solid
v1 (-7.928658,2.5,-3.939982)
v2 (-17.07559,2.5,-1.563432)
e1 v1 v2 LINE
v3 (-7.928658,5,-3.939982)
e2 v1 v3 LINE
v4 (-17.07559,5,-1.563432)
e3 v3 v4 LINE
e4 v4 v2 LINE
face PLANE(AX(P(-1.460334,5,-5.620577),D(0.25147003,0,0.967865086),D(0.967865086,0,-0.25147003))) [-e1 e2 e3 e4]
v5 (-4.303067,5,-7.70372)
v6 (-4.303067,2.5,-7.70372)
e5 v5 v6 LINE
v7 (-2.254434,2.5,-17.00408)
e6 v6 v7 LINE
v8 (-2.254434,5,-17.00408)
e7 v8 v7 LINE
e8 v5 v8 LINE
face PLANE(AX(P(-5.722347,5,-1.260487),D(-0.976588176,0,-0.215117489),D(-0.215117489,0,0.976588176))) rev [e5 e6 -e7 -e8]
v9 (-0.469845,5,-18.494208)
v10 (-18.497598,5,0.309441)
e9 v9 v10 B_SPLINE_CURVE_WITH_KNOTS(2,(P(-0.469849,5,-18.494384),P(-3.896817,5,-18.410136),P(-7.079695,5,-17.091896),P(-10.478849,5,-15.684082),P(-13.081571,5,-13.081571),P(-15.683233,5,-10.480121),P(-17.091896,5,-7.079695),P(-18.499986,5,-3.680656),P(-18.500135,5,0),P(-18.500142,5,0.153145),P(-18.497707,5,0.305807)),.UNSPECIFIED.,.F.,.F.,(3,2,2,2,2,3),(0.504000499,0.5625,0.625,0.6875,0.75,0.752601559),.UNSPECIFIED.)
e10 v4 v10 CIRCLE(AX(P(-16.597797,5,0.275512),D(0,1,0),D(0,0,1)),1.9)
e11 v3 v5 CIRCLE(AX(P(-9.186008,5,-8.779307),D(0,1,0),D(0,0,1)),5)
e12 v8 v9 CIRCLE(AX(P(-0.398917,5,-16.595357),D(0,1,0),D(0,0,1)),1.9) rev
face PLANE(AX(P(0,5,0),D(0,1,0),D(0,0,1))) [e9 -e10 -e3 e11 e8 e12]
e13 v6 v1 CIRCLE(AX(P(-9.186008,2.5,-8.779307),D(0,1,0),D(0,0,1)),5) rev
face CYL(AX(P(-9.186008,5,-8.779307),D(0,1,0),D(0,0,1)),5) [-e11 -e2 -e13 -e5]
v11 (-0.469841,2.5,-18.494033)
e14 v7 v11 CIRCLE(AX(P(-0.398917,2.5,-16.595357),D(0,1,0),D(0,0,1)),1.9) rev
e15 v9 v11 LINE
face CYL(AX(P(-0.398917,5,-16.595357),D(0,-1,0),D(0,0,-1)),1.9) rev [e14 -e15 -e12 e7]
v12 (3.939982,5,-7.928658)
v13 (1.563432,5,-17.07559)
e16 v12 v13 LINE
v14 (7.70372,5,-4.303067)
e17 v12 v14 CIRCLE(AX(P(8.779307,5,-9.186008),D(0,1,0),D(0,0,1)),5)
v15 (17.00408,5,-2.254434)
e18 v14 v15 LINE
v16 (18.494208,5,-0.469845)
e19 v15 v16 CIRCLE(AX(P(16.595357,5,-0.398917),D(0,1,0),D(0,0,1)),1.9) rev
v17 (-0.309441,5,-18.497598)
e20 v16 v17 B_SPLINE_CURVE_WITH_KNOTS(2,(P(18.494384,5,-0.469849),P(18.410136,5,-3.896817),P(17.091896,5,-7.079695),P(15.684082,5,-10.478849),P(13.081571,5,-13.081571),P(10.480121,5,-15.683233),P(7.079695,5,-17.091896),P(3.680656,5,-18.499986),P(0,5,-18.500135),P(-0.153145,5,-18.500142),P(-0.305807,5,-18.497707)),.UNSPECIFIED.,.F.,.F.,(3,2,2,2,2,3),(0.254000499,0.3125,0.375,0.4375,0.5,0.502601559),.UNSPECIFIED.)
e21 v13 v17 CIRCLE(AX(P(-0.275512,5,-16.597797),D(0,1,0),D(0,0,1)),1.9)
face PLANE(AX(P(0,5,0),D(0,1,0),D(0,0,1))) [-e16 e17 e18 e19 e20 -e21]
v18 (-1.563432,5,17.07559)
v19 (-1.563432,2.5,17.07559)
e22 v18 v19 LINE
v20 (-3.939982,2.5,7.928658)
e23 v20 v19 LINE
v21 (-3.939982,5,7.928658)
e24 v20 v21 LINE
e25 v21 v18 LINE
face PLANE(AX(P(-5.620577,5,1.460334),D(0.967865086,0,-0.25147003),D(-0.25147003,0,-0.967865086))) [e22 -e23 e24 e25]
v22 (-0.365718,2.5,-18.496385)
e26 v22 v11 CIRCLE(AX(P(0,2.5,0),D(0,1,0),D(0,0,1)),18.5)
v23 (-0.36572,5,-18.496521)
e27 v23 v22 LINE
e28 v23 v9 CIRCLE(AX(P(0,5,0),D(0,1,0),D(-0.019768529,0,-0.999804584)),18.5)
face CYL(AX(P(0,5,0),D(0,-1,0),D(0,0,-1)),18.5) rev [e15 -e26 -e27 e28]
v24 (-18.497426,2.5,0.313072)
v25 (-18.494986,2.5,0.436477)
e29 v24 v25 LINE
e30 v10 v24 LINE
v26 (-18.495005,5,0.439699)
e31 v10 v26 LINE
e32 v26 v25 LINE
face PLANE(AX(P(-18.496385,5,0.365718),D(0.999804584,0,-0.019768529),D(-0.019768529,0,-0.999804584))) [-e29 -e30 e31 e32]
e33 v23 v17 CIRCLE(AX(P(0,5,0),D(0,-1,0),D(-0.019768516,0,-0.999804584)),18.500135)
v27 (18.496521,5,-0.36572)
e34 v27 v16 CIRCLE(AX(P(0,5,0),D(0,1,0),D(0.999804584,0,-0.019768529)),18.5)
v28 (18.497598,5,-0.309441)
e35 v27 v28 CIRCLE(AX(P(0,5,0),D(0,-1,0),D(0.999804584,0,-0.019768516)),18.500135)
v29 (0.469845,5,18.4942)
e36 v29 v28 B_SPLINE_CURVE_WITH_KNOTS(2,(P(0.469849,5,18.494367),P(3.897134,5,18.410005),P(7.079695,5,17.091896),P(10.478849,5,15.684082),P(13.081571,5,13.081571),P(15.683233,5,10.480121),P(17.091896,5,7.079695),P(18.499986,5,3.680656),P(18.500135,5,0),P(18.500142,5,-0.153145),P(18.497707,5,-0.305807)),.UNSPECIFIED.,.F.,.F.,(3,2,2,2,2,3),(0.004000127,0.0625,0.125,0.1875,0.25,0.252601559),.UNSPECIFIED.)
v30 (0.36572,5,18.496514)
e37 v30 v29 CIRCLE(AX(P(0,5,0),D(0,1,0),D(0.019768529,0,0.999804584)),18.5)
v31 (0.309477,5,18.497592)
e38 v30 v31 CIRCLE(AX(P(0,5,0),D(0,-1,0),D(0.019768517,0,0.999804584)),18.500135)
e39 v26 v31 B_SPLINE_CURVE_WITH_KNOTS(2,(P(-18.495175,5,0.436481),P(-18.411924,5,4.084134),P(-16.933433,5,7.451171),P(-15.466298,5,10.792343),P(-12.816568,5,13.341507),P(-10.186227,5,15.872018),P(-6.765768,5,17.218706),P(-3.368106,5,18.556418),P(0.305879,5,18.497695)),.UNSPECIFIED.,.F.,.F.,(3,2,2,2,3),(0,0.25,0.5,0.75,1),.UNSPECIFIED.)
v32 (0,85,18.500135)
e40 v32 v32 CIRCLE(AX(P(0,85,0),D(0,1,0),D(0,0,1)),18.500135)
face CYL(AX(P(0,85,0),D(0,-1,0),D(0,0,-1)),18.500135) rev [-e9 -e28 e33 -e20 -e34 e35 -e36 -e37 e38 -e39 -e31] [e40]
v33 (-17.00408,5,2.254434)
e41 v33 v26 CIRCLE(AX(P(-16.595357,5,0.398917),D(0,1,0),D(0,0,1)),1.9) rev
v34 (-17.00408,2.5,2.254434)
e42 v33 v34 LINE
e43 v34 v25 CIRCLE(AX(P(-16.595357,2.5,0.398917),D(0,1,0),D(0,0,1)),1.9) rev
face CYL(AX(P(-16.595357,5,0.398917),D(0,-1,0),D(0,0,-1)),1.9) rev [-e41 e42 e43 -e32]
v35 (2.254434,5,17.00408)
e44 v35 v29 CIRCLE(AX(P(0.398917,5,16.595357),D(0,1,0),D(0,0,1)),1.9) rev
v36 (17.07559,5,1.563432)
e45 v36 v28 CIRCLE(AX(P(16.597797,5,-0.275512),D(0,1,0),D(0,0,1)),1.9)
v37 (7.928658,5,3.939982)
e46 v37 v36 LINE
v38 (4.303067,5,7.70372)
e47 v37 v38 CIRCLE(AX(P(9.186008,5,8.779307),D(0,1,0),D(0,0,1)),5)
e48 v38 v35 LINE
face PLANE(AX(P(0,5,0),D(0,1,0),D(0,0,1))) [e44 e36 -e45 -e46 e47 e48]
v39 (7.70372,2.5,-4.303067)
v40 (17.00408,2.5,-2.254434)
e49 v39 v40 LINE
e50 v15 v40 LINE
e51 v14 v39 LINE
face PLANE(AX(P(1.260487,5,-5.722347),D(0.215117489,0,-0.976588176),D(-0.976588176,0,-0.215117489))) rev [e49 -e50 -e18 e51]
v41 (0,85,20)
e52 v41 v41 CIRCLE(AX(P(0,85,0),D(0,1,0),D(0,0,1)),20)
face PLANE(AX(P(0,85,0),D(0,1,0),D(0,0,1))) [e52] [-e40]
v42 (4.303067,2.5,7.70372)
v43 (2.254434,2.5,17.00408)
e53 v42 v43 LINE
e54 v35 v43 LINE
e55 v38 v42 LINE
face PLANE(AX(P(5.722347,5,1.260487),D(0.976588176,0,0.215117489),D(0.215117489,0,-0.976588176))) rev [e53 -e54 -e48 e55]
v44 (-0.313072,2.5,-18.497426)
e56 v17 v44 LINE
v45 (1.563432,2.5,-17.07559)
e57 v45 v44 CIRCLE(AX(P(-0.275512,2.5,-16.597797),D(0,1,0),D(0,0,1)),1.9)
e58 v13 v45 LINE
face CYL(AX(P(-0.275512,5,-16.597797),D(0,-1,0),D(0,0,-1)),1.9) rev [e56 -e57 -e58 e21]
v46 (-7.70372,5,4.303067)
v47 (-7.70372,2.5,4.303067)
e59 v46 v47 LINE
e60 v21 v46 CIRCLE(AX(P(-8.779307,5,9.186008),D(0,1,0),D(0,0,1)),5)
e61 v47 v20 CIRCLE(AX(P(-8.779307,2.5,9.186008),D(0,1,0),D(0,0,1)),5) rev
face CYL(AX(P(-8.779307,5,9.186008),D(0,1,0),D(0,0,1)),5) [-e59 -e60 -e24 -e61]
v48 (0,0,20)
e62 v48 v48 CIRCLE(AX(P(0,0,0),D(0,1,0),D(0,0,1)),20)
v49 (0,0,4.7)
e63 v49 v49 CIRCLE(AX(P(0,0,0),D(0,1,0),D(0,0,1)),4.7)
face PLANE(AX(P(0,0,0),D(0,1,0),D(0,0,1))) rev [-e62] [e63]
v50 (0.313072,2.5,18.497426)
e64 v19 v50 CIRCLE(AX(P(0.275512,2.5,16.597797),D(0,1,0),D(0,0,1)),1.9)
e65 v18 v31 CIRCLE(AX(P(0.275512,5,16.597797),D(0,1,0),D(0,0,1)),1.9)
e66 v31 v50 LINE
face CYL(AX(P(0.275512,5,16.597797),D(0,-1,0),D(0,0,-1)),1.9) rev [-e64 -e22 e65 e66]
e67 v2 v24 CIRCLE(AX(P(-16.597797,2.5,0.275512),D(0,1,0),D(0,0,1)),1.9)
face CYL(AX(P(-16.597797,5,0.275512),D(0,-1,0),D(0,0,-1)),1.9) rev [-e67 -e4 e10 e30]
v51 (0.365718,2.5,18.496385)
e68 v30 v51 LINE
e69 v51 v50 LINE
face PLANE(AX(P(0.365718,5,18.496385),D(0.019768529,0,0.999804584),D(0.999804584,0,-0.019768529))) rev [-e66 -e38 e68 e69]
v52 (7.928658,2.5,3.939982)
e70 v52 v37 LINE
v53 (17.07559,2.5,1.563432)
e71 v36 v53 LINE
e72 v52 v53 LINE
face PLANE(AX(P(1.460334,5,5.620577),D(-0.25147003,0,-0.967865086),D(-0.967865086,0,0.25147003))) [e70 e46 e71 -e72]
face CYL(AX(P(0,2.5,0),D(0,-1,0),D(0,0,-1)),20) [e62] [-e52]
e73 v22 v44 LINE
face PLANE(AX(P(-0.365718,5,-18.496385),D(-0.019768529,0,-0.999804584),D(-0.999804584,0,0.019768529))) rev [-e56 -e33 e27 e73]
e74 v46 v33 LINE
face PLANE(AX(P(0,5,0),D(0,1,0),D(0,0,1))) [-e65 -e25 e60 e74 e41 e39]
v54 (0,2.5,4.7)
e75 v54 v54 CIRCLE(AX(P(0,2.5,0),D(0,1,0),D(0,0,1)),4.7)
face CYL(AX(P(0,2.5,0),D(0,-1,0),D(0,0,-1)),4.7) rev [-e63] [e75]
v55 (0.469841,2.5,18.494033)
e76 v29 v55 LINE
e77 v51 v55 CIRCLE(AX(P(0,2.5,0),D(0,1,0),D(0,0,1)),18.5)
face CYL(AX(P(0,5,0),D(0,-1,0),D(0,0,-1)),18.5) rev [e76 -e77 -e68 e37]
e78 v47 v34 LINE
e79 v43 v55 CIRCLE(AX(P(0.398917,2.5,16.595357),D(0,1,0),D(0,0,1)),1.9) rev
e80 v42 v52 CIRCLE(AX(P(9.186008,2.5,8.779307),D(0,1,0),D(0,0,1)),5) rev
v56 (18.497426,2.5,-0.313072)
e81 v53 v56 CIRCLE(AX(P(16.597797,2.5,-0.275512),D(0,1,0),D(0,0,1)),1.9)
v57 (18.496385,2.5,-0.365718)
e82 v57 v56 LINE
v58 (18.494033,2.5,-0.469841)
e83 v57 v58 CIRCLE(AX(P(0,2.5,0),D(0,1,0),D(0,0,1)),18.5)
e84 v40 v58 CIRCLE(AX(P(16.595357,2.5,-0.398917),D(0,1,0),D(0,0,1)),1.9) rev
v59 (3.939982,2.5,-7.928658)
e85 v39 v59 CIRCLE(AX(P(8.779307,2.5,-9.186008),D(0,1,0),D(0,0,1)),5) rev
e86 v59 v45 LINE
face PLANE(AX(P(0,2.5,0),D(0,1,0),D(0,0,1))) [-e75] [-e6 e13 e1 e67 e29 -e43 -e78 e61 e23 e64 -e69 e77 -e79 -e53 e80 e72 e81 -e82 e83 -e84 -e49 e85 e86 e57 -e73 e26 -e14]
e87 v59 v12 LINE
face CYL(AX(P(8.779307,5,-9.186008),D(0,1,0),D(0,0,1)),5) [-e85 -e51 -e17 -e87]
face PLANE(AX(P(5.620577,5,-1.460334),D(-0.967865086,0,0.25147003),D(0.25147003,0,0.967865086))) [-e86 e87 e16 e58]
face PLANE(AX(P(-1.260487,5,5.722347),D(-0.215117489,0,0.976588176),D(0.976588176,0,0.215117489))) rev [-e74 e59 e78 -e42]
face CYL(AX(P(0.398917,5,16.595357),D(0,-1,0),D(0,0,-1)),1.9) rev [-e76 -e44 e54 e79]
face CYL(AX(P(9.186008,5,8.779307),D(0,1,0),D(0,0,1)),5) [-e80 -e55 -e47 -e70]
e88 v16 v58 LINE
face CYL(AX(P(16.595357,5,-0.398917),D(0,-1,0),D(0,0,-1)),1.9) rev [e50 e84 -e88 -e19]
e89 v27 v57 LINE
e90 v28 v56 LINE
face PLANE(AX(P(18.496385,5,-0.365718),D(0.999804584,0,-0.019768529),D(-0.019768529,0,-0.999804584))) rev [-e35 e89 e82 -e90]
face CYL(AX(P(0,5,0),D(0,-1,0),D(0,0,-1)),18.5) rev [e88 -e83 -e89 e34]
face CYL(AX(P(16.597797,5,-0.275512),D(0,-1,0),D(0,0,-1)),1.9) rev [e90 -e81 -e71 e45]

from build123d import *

# Parameters (mm, degrees)
SKETCH_1_R      = 20
SKETCH_1_R_2    = 4.7
EXTRUDE_1_DEPTH = 2.5
SKETCH_2_R      = 20
EXTRUDE_2_DEPTH = 2.5
FILLET_1_R      = 5
SKETCH_3_R      = 20
SKETCH_3_R_2    = 18.500135374
EXTRUDE_3_DEPTH = 80


with BuildPart() as part:
    # 草图1 → 凸台-拉伸1 (new body)
    with BuildSketch(Plane(origin=(0, 0, 0), x_dir=(1, 0, 0), z_dir=(0, 1, 0))):
        Circle(SKETCH_1_R)
        Circle(SKETCH_1_R_2, mode=Mode.SUBTRACT)
    extrude(amount=EXTRUDE_1_DEPTH)

    # 草图2 → 凸台-拉伸2 (add)
    with BuildSketch(Plane(origin=(0, 2.5, 0), x_dir=(1, 0, 0), z_dir=(0, 1, 0))):
        Circle(SKETCH_2_R)
        with BuildLine():
            Line((-1.563432113, -17.075590083), (-4.71068404, -4.96235635))
            Line((-4.71068404, -4.96235635), (-17.004080234, -2.254434443))
            ThreePointArc((-17.004080234, -2.254434443), (-18.064494297, -1.603755329), (-18.494985714, -0.436477113))
            Line((-18.494985714, -0.436477113), (-18.496384796, -0.365717778))
            Line((-18.496384796, -0.365717778), (-18.497425733, -0.313071754))
            ThreePointArc((-18.497425733, -0.313071754), (-18.11217817, 0.871942042), (-17.075590083, 1.563432113))
            Line((-17.075590083, 1.563432113), (-4.96235635, 4.71068404))
            Line((-4.96235635, 4.71068404), (-2.254434443, 17.004080234))
            ThreePointArc((-2.254434443, 17.004080234), (-1.616612902, 18.053855023), (-0.469840502, 18.494032819))
            ThreePointArc((-0.469840502, 18.494032819), (-0.417780795, 18.49528208), (-0.365717778, 18.496384796))
            Line((-0.365717778, 18.496384796), (-0.313071754, 18.497425733))
            ThreePointArc((-0.313071754, 18.497425733), (0.871942042, 18.11217817), (1.563432113, 17.075590083))
            Line((1.563432113, 17.075590083), (4.71068404, 4.96235635))
            Line((4.71068404, 4.96235635), (17.004080234, 2.254434443))
            ThreePointArc((17.004080234, 2.254434443), (18.053855023, 1.616612902), (18.494032819, 0.469840502))
            ThreePointArc((18.494032819, 0.469840502), (18.49528208, 0.417780795), (18.496384796, 0.365717778))
            Line((18.496384796, 0.365717778), (18.497425733, 0.313071754))
            ThreePointArc((18.497425733, 0.313071754), (18.11217817, -0.871942042), (17.075590083, -1.563432113))
            Line((17.075590083, -1.563432113), (4.96235635, -4.71068404))
            Line((4.96235635, -4.71068404), (2.254434443, -17.004080234))
            ThreePointArc((2.254434443, -17.004080234), (1.616612902, -18.053855023), (0.469840502, -18.494032819))
            ThreePointArc((0.469840502, -18.494032819), (0.417780795, -18.49528208), (0.365717778, -18.496384796))
            Line((0.365717778, -18.496384796), (0.313071754, -18.497425733))
            ThreePointArc((0.313071754, -18.497425733), (-0.871942042, -18.11217817), (-1.563432113, -17.075590083))
        make_face(mode=Mode.SUBTRACT)
    extrude(amount=EXTRUDE_2_DEPTH)

    # 圆角1
    fillet_1_edges = [part.edges().sort_by_distance(p)[0] for p in [
        (-4.71068404, 3.75, 4.96235635),
        (-4.96235635, 3.75, -4.71068404),
        (4.96235635, 3.75, 4.71068404),
        (4.71068404, 3.75, -4.96235635),
    ]]
    fillet(fillet_1_edges, radius=FILLET_1_R)

    # 草图3 → 凸台-拉伸3 (add)
    with BuildSketch(Plane(origin=(0, 5, 0), x_dir=(1, 0, 0), z_dir=(0, 1, 0))):
        Circle(SKETCH_3_R)
        Circle(SKETCH_3_R_2, mode=Mode.SUBTRACT)
    extrude(amount=EXTRUDE_3_DEPTH)


solid = part.part
